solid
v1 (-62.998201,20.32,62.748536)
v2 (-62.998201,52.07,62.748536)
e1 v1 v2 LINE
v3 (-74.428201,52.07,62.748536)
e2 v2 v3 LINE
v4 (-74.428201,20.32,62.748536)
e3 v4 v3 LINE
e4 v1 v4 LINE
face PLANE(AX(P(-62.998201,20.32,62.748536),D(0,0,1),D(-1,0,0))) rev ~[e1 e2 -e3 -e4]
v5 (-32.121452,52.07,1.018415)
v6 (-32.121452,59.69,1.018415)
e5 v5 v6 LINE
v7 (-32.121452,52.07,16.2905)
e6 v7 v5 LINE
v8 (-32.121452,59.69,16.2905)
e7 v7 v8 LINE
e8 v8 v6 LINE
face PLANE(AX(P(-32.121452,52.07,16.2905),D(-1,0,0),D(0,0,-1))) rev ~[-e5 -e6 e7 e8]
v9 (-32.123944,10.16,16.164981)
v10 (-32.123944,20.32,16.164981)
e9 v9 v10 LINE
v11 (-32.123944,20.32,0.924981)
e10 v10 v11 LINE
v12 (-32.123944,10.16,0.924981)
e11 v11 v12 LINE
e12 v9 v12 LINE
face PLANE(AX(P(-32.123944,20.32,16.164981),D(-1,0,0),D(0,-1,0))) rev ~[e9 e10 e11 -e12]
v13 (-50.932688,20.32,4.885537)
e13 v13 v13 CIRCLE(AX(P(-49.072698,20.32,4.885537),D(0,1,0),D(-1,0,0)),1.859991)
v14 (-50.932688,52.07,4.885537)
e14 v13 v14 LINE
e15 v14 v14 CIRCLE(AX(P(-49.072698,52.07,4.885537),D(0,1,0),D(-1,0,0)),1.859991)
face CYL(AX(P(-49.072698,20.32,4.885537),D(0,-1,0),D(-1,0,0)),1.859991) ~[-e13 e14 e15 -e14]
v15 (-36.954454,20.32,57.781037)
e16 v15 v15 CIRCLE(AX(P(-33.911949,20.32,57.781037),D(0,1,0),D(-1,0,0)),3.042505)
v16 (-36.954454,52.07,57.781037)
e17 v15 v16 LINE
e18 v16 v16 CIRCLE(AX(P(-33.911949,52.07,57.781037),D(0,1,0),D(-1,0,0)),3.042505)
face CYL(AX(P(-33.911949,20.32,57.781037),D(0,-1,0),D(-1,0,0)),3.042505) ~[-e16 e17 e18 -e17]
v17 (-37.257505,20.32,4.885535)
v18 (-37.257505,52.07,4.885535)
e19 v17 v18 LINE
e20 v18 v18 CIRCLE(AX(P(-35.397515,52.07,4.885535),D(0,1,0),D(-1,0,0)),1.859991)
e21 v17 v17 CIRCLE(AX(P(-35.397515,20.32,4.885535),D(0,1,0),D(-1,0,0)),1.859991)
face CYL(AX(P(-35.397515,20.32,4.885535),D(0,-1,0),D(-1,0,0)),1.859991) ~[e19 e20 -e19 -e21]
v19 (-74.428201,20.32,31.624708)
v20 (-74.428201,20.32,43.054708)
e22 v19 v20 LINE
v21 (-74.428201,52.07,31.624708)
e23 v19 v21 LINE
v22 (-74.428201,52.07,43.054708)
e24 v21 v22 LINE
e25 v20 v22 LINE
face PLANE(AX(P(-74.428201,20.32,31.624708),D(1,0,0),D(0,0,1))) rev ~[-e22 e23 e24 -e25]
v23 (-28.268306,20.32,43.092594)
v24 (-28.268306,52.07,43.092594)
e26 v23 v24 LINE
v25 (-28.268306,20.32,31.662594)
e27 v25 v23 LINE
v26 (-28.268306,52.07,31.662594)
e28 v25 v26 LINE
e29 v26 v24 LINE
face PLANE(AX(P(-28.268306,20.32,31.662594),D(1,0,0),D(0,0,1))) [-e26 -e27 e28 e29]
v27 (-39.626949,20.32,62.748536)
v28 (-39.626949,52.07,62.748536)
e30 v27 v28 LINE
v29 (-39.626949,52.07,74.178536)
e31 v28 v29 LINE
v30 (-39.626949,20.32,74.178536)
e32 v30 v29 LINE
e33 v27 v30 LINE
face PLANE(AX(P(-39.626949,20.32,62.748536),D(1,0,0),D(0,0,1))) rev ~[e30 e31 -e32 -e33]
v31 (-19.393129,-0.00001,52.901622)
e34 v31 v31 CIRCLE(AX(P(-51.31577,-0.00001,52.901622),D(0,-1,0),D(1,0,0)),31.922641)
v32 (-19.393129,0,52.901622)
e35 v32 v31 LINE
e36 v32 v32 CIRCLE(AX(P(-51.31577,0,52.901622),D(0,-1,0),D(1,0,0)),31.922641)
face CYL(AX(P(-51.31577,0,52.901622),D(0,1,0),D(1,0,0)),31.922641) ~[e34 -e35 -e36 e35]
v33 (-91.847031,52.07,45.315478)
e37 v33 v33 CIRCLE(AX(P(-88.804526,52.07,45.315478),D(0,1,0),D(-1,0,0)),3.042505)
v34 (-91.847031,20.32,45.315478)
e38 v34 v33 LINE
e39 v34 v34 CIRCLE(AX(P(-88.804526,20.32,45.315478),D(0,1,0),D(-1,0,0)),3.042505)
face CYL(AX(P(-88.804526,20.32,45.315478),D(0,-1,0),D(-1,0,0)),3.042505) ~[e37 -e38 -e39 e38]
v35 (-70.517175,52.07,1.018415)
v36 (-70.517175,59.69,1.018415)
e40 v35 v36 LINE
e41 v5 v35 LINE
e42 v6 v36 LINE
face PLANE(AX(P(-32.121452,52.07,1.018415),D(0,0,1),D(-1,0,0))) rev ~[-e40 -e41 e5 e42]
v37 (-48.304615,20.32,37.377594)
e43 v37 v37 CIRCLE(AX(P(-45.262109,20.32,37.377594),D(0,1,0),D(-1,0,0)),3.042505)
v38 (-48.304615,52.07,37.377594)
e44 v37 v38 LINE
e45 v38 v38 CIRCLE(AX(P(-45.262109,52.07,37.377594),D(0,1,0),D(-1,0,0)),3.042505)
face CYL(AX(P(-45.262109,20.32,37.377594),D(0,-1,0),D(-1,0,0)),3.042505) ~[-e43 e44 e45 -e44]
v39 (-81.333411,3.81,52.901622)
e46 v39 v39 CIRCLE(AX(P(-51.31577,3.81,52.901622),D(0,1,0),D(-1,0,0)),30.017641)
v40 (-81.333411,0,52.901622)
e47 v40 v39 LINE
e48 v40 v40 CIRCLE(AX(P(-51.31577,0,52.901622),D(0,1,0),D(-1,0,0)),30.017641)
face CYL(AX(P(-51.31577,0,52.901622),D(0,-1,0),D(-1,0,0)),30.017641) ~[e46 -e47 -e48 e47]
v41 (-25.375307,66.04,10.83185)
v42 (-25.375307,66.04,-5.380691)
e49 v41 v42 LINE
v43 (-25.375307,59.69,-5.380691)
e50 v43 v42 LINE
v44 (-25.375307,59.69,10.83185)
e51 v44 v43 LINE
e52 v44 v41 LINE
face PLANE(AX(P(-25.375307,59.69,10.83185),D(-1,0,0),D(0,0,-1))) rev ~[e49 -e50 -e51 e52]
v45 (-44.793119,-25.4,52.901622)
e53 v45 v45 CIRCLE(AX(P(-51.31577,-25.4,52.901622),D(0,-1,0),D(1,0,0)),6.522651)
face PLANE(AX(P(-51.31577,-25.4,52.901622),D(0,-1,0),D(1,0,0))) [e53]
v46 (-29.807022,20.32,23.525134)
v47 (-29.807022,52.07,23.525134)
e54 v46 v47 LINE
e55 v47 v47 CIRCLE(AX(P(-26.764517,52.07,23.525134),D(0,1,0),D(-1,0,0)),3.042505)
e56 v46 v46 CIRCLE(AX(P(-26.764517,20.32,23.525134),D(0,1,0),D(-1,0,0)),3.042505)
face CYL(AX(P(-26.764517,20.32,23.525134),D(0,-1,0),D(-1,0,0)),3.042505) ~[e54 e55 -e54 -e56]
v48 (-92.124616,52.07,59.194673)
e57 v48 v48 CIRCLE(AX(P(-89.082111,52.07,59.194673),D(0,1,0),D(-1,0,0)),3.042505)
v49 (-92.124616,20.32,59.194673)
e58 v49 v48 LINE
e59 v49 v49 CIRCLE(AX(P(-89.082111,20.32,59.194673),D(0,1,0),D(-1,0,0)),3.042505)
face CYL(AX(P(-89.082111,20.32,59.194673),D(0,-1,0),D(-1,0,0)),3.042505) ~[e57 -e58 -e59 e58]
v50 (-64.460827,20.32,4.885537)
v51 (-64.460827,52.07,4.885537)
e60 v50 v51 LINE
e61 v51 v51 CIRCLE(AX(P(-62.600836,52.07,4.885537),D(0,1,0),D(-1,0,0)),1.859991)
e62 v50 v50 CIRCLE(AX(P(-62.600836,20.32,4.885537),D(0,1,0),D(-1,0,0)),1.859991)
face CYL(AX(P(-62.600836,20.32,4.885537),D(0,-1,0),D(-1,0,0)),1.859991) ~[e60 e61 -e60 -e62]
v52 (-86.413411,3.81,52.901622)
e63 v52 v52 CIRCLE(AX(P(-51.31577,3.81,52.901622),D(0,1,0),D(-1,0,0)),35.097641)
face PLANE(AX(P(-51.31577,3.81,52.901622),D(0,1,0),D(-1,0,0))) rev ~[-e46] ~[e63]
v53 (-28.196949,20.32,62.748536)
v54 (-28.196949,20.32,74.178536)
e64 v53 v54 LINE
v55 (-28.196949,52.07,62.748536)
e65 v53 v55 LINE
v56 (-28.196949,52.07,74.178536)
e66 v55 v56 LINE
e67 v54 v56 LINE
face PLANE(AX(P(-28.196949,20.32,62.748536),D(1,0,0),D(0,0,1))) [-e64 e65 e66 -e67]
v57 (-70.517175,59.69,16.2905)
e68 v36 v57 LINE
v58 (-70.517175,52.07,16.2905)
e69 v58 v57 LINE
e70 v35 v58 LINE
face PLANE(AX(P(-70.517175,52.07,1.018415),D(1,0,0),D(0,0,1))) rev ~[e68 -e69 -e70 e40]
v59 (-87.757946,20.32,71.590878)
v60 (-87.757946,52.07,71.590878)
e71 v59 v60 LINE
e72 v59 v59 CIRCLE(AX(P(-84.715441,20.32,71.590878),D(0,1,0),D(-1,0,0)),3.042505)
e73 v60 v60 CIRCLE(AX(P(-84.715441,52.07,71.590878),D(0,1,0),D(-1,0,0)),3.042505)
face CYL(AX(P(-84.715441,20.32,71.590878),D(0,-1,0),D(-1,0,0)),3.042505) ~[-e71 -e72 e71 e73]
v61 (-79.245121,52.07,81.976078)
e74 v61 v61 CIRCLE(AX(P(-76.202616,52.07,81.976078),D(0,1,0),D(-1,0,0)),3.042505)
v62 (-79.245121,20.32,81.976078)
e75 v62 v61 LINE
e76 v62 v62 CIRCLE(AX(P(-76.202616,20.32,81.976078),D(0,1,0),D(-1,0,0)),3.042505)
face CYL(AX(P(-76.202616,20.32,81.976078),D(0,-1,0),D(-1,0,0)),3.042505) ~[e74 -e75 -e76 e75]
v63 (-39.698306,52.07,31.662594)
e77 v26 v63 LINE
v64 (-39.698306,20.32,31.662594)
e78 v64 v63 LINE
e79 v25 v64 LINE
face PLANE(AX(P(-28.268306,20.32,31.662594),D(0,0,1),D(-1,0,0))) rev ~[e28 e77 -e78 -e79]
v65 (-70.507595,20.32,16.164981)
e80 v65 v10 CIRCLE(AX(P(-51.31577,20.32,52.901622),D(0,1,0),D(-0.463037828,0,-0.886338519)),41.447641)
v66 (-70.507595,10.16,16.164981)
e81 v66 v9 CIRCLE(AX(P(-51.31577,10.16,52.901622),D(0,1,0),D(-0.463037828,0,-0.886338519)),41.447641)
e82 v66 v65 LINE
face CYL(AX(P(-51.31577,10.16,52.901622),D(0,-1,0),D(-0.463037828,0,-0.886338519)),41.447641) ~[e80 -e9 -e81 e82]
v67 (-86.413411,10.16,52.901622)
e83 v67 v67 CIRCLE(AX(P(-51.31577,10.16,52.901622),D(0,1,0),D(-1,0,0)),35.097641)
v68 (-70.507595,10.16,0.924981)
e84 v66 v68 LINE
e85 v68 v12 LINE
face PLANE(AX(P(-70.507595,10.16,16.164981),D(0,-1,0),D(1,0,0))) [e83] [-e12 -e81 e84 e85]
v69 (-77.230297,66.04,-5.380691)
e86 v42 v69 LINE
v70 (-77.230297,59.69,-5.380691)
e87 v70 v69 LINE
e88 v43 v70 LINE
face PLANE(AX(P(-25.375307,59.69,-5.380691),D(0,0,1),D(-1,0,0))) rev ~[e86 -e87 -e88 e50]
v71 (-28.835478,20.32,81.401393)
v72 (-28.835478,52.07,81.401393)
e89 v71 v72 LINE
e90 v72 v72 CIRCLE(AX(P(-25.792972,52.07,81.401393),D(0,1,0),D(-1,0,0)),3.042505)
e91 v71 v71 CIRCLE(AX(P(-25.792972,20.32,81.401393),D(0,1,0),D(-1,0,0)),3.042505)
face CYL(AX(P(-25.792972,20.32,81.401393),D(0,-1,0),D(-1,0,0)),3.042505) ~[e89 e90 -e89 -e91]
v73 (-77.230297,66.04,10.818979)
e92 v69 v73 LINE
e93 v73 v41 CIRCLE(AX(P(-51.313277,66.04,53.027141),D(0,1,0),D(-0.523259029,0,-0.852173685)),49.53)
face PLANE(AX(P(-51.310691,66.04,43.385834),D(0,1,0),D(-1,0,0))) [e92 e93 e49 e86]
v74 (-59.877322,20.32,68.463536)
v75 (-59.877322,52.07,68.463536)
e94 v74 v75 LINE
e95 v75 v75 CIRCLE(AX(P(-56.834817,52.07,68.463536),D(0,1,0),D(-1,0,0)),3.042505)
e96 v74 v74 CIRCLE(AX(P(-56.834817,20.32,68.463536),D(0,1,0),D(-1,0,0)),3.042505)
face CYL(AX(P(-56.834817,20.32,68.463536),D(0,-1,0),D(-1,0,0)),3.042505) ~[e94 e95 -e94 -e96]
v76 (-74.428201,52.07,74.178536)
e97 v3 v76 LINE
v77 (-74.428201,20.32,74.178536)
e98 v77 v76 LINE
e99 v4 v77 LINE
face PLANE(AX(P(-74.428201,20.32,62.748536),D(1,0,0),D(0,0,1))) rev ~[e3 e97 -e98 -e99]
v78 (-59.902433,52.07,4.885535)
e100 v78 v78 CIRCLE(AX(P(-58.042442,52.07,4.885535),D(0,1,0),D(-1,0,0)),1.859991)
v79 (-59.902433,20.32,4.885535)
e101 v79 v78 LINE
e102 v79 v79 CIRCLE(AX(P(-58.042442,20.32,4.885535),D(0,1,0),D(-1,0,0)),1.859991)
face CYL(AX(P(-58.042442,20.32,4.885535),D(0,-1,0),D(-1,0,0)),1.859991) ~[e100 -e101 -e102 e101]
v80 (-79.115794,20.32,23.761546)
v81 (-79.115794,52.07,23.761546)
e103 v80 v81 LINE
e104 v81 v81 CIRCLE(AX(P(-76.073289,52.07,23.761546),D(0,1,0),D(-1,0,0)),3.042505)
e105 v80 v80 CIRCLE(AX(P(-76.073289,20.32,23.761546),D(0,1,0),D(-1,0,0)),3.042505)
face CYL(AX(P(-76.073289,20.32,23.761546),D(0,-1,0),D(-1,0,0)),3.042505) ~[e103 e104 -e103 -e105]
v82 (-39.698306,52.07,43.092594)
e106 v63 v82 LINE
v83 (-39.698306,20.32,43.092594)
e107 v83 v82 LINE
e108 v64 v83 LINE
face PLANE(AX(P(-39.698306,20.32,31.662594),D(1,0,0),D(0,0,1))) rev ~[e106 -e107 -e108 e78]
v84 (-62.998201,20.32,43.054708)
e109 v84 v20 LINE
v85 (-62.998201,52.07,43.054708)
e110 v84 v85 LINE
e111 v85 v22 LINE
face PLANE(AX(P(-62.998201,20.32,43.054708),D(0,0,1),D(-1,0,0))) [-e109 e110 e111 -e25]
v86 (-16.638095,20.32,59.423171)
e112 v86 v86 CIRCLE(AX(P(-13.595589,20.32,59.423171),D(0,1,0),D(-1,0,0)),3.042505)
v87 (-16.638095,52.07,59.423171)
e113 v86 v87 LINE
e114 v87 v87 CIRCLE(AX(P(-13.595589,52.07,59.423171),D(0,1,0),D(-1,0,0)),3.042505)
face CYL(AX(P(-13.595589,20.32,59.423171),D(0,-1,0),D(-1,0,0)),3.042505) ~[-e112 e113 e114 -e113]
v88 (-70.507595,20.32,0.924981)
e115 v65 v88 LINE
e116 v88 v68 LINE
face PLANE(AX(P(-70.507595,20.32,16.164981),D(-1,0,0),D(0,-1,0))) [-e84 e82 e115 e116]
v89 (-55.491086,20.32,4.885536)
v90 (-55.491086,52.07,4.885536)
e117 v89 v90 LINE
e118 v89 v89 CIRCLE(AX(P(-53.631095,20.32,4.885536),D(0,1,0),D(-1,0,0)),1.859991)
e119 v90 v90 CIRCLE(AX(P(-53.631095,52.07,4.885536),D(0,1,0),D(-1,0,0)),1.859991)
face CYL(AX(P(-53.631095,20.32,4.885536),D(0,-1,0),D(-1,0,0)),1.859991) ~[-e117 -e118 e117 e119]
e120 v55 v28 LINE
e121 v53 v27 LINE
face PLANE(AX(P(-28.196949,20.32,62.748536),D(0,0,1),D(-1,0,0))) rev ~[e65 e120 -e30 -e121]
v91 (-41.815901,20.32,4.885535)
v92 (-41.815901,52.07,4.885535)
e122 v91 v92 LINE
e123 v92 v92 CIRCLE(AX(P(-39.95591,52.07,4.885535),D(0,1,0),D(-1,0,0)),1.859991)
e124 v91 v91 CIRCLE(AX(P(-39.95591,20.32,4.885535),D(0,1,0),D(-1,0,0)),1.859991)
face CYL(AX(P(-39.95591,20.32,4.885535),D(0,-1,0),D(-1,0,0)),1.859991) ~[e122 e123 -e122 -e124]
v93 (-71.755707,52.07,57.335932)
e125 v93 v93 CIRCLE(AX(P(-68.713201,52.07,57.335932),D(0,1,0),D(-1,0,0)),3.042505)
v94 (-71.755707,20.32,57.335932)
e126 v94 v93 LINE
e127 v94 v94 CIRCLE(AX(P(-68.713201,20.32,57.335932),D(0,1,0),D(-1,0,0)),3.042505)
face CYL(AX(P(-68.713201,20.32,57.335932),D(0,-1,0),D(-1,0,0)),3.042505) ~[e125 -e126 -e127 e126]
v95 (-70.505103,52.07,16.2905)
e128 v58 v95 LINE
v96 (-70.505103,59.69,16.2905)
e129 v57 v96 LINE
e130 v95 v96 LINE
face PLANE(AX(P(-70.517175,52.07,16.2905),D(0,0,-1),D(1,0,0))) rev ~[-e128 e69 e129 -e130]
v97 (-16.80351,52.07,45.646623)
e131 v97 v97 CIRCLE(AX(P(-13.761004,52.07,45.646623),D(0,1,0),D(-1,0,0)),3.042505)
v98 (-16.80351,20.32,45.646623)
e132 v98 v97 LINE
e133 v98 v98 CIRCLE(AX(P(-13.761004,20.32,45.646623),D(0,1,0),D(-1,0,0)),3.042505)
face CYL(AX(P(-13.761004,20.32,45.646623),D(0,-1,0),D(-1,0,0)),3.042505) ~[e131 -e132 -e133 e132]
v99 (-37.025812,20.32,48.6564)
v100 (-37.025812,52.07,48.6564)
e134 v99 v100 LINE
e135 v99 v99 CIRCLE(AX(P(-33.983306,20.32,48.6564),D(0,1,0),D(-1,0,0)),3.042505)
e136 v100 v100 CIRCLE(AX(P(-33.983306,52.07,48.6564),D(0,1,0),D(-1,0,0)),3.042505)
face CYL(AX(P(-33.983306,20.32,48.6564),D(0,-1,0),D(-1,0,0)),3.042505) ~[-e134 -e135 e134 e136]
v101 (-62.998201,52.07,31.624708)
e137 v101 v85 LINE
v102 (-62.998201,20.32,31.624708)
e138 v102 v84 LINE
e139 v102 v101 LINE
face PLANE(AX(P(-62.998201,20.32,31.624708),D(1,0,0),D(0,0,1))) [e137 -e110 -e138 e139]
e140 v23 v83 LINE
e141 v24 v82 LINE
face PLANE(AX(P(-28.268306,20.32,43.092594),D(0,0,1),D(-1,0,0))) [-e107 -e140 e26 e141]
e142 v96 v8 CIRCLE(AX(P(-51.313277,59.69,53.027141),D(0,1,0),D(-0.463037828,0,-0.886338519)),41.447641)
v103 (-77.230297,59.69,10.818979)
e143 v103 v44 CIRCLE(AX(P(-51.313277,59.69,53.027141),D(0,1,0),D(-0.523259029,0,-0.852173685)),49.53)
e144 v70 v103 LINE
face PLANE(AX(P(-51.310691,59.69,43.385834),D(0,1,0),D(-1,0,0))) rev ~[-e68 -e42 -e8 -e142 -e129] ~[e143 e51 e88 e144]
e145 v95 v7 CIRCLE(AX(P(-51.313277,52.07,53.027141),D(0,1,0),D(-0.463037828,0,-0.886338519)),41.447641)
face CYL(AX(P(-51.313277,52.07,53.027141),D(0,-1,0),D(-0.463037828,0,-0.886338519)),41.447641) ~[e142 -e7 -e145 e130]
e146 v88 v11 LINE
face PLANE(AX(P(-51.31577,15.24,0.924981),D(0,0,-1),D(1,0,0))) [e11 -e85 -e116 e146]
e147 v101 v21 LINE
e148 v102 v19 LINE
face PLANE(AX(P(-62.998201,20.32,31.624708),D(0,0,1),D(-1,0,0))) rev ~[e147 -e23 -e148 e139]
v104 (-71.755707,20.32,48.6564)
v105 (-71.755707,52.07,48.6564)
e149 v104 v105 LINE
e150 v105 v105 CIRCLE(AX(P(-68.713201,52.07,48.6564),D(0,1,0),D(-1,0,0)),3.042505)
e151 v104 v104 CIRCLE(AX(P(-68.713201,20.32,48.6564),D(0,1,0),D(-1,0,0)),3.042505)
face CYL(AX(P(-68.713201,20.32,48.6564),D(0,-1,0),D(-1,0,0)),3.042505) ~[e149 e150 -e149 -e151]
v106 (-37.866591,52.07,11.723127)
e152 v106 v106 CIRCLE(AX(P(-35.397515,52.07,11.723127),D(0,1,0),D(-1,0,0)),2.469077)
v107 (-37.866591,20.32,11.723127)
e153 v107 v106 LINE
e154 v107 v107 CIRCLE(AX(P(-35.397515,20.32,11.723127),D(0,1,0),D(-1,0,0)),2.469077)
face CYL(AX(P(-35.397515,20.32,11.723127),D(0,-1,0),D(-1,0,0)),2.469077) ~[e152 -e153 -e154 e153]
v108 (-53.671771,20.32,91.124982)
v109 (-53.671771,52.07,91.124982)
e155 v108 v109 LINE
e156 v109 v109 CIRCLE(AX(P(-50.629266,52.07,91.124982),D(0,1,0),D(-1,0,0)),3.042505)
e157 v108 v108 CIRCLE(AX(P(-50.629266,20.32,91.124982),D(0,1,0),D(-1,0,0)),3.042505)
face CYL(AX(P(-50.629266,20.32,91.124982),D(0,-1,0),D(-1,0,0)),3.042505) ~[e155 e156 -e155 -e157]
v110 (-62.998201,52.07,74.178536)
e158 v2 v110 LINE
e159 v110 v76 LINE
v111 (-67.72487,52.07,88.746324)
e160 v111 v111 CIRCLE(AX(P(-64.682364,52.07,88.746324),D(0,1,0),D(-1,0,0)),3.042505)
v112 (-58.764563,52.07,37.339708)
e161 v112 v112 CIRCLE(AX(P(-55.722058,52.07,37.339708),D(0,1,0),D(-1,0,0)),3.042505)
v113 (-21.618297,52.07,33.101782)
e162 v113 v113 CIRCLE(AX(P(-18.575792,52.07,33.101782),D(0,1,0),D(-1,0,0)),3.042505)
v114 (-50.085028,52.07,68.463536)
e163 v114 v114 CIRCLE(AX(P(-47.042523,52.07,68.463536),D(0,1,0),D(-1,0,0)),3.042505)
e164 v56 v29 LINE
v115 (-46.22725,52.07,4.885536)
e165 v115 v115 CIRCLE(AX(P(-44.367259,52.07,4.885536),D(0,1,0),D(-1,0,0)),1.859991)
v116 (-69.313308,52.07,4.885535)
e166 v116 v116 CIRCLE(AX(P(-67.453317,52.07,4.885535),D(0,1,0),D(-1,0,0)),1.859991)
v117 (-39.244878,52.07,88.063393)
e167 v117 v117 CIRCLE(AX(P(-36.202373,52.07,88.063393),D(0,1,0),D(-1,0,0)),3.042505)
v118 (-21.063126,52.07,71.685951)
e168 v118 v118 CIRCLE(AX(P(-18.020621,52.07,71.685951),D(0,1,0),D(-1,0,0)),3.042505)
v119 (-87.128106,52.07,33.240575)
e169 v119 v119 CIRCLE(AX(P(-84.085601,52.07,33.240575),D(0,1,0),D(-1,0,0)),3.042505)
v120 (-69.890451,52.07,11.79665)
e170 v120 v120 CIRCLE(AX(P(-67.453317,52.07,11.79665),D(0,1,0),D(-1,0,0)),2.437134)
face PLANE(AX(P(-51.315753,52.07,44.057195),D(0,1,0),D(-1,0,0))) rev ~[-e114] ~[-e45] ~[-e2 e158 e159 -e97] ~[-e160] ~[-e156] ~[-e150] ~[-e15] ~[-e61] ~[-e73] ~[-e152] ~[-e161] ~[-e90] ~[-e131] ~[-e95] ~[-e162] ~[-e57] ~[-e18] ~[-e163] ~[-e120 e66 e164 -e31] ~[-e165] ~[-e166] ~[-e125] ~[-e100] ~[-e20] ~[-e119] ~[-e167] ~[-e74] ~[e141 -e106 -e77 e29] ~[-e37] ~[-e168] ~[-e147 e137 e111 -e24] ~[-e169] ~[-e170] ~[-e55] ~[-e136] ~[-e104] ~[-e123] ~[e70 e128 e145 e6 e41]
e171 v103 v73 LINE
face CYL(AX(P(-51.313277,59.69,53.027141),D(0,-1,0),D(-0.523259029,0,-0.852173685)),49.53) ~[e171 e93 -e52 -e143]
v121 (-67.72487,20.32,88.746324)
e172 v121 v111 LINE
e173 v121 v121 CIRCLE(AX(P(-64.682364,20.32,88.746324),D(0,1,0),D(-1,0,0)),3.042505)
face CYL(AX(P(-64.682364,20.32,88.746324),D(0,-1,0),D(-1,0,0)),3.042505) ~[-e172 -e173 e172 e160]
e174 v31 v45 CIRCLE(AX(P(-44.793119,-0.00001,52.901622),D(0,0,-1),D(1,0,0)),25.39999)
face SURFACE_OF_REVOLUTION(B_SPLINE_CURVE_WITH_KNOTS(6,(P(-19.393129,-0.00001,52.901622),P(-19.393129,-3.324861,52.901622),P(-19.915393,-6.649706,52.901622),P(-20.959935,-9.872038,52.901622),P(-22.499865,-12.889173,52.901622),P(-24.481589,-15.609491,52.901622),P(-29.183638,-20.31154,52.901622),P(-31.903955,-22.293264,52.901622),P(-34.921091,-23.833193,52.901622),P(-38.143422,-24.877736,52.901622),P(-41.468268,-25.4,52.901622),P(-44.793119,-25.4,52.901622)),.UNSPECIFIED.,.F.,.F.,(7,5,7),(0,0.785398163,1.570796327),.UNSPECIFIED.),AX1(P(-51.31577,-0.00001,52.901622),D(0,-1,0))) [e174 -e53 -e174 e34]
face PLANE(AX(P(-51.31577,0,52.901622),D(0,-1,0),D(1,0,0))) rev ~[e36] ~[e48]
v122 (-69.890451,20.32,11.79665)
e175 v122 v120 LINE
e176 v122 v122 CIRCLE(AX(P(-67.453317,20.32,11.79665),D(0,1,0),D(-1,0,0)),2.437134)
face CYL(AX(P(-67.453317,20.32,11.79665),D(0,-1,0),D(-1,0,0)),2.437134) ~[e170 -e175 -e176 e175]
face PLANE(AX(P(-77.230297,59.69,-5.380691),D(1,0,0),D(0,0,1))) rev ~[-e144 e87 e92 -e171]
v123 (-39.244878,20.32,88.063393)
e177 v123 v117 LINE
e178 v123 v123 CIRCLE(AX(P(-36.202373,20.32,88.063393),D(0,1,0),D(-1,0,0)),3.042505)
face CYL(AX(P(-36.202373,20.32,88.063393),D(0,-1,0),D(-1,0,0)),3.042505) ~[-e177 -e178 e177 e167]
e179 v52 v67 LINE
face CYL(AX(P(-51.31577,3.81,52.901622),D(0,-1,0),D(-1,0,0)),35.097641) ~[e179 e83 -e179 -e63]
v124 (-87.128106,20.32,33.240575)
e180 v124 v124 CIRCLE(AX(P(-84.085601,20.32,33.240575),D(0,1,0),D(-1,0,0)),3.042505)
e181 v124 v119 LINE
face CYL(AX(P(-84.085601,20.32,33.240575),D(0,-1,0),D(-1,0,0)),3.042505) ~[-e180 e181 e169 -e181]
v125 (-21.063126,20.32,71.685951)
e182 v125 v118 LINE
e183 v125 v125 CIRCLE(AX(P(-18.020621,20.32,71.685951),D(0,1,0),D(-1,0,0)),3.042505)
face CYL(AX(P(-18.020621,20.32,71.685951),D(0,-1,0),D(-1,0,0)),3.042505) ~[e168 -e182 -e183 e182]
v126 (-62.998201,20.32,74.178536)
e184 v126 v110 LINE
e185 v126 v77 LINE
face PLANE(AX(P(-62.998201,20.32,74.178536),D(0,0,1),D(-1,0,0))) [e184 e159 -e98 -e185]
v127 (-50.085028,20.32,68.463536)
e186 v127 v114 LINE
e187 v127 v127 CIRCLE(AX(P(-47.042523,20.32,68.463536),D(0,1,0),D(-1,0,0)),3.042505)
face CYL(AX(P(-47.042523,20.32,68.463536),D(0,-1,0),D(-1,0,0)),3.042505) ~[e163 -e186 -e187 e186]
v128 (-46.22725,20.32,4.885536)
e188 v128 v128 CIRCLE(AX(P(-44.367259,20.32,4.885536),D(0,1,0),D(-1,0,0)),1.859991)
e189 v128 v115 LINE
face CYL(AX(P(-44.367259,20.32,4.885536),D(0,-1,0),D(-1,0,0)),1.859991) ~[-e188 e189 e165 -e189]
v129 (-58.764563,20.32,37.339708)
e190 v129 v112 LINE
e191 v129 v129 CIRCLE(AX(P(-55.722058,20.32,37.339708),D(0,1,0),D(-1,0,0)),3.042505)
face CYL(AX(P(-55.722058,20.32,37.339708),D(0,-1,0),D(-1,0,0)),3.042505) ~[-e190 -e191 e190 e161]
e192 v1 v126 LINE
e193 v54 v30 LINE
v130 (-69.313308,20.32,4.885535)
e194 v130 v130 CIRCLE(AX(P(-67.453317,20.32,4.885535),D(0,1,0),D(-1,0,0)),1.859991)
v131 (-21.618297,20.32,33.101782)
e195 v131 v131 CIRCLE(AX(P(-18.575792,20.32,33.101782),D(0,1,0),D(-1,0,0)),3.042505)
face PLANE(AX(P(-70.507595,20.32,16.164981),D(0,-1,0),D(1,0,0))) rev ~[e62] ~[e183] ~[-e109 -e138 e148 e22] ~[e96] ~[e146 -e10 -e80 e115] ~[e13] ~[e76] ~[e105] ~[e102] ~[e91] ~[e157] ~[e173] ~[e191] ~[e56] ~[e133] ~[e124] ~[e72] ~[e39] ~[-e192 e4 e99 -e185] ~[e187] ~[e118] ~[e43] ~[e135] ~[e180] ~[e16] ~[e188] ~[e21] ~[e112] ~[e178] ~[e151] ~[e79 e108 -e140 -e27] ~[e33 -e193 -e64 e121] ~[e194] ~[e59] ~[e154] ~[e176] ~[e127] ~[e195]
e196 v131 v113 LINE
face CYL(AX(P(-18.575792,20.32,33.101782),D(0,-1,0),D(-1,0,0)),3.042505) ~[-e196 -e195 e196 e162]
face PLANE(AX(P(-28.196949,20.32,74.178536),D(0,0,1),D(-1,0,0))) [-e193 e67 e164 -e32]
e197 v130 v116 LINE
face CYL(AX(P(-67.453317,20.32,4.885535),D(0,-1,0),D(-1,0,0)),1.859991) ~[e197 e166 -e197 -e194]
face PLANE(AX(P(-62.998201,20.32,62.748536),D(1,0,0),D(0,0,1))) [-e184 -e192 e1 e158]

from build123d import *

# Parameters (mm, degrees)
F1_DEPTH  = 25.4
F2_R      = 25.39999
F3_R      = 30.0176409496
F4_DEPTH  = 3.81
F5_R      = 35.0976409496
F6_DEPTH  = 6.35
F7_R      = 35.0976409496
F8_DEPTH  = 10.16
F9_DEPTH  = 10.16
F10_W     = 38.3836512671
F10_H     = 10.16
F11_DEPTH = 15.24
F12_R     = 3.0425051658
F13_DEPTH = 31.75
F12_R_2   = 1.8599906357
F12_R_3   = 2.469076523
F12_R_4   = 2.4371339636
F12_W     = 11.43
F12_H     = 11.43
F15_DEPTH = 7.62
F18_DEPTH = 6.35


# Not quite as in the source:
# - a fillet or chamfer is up to 0.001 mm smaller than in the source, because OpenCascade refuses the exact size


with BuildPart() as f1:
    # F0 (on Front) → F1 (new body)
    with BuildSketch(Plane.XZ):
        with BuildLine():
            ThreePointArc((-51.3157695532, 20.9789809584), (-28.7430536644, 30.3289060191), (-19.3931286036, 52.9016219079))
            ThreePointArc((-19.3931286036, 52.9016219079), (-73.888485442, 75.4743377968), (-51.3157695532, 20.9789809584))
        make_face()
    extrude(amount=F1_DEPTH)

    # F2 (radius 25.4 in the source; OpenCascade refuses exactly that, so slightly less here)
    f2_edges = [f1.edges().sort_by_distance(p)[0] for p in [
        (-51.31577, -25.4, 84.824263),
    ]]
    fillet(f2_edges, radius=F2_R)

    # F3 (on face) → F4 (join)
    with BuildSketch(Plane(origin=(0, 0, 0), x_dir=(-1, 0, 0), z_dir=(0, 1, 0))):
        with Locations((51.3157695532, 52.9016219079)):
            Circle(F3_R)
    extrude(amount=F4_DEPTH)

    # F5 (on face) → F6 (join)
    with BuildSketch(Plane(origin=(0, 3.81, 0), x_dir=(-1, 0, 0), z_dir=(0, 1, 0))):
        with Locations((51.3157695532, 52.9016219079)):
            Circle(F5_R)
    extrude(amount=F6_DEPTH)



with BuildPart() as f8:
    # F7 (on face) → F8 (new body)
    with BuildSketch(Plane(origin=(0, 10.16, 0), x_dir=(-1, 0, 0), z_dir=(0, 1, 0))):
        with BuildLine():
            Line((32.1239439196, 16.1649812187), (70.5075951867, 16.1649812187))
            ThreePointArc((70.5075951867, 16.1649812187), (51.3157695532, 94.3492628575), (32.1239439196, 16.1649812187))
        make_face()
        with Locations((51.3157695532, 52.9016219079)):
            Circle(F7_R, mode=Mode.SUBTRACT)
    extrude(amount=F8_DEPTH)


with BuildPart() as f1_1:
    add(f1.part)

    add(f8.part)  # F9 merges F8
    # F7 (on face) → F9 (join)
    with BuildSketch(Plane(origin=(0, 10.16, 0), x_dir=(-1, 0, 0), z_dir=(0, 1, 0))):
        with Locations((51.3157695532, 52.9016219079)):
            Circle(F7_R)
    extrude(amount=F9_DEPTH)

    # F10 (on face) → F11 (join)
    with BuildSketch(Plane(origin=(0, 0, 16.1649812187), x_dir=(1, 0, 0), z_dir=(0, 0, -1))):
        with Locations((-51.3157695532, -15.24)):
            Rectangle(F10_W, F10_H)
    extrude(amount=F11_DEPTH)

    # F12 (on face) → F13, piece 2 (join)
    with BuildSketch(Plane(origin=(0, 20.32, 0), x_dir=(-1, 0, 0), z_dir=(0, 1, 0))):
        with Locations((67.4533173442, 4.8855347559)):
            Circle(F12_R_2)
        with Locations((35.3975147009, 4.8855352215)):
            Circle(F12_R_2)
        with Locations((39.9559102952, 4.8855347559)):
            Circle(F12_R_2)
        with Locations((44.3672593683, 4.8855361529)):
            Circle(F12_R_2)
        with Locations((49.0726977587, 4.8855366185)):
            Circle(F12_R_2)
        with Locations((53.6310952157, 4.8855361529)):
            Circle(F12_R_2)
        with Locations((58.0424424261, 4.8855347559)):
            Circle(F12_R_2)
        with Locations((62.6008361578, 4.8855366185)):
            Circle(F12_R_2)
        with Locations((35.3975147009, 11.7231269833)):
            Circle(F12_R_3)
        with Locations((67.4533173442, 11.7966495454)):
            Circle(F12_R_4)
        with Locations((13.5955894366, 59.4231709838)):
            Circle(F12_R)
        with Locations((50.6292656064, 91.1249816418)):
            Circle(F12_R)
        with Locations((18.5757915024, 33.1017822027)):
            Circle(F12_R)
        with Locations((25.7929724175, 81.4013928175)):
            Circle(F12_R)
        with Locations((89.0821111389, 59.1946728528)):
            Circle(F12_R)
        with Locations((84.0856006835, 33.2405753434)):
            Circle(F12_R)
        with Locations((76.2026160955, 81.9760784507)):
            Circle(F12_R)
        with Locations((36.2023725174, 88.0633927882)):
            Circle(F12_R)
        with Locations((88.8045257889, 45.3154779971)):
            Circle(F12_R)
        with Locations((18.0206210352, 71.6859512031)):
            Circle(F12_R)
        with Locations((13.761004433, 45.646622777)):
            Circle(F12_R)
        with Locations((64.6823644638, 88.7463241816)):
            Circle(F12_R)
        with Locations((84.7154408693, 71.5908780694)):
            Circle(F12_R)
        with Locations((26.7645169515, 23.525133729)):
            Circle(F12_R)
        with Locations((76.0732889175, 23.7615462393)):
            Circle(F12_R)
        with Locations((68.7132014135, 68.4635355137)):
            Rectangle(F12_W, F12_H)
        with Locations((33.9833064711, 37.3775935507)):
            Rectangle(F12_W, F12_H)
        with Locations((33.9119490236, 68.4635355137)):
            Rectangle(F12_W, F12_H)
        with Locations((68.7132014135, 37.3397083022)):
            Rectangle(F12_W, F12_H)
        with Locations((33.9833064711, 48.6564002931)):
            Circle(F12_R)
        with Locations((33.9119490236, 57.7810369432)):
            Circle(F12_R)
        with Locations((56.8348169327, 68.4635355137)):
            Circle(F12_R)
        with Locations((68.7132014135, 57.3359318078)):
            Circle(F12_R)
        with Locations((68.7132014135, 48.6564002931)):
            Circle(F12_R)
        with Locations((55.7220578194, 37.3397083022)):
            Circle(F12_R)
        with Locations((47.0425225794, 68.4635355137)):
            Circle(F12_R)
        with Locations((45.2621094882, 37.3775935507)):
            Circle(F12_R)
    extrude(amount=F13_DEPTH)

    # F14 (on face) → F15 (join)
    with BuildSketch(Plane(origin=(0, 52.07, 0), x_dir=(-1, 0, 0), z_dir=(0, 1, 0))):
        with BuildLine():
            Line((70.5171748996, 16.2905004551), (70.5051029675, 16.2905004551))
            ThreePointArc((70.5051029675, 16.2905004551), (51.313277334, 94.474782094), (32.1214517004, 16.2905004551))
            Line((32.1214517004, 16.2905004551), (32.1214517004, 1.0184145067))
            Line((32.1214517004, 1.0184145067), (70.5171748996, 1.0184145067))
            Line((70.5171748996, 1.0184145067), (70.5171748996, 16.2905004551))
        make_face()
    extrude(amount=F15_DEPTH)

    # F17 (on face) → F18 (join)
    with BuildSketch(Plane(origin=(0, 59.69, 0), x_dir=(-1, 0, 0), z_dir=(0, 1, 0))):
        with BuildLine():
            Line((77.230297029, -5.3806910291), (77.230297029, 10.8189785437))
            ThreePointArc((77.230297029, 10.8189785437), (51.3255716567, 102.5571396186), (25.3753070366, 10.8318499752))
            Line((25.3753070366, 10.8318499752), (25.3753070366, -5.3806910291))
            Line((25.3753070366, -5.3806910291), (77.230297029, -5.3806910291))
        make_face()
    extrude(amount=F18_DEPTH)


with BuildPart() as f13:
    # F12 (on face) → F13 (new body)
    with BuildSketch(Plane(origin=(0, 20.32, 0), x_dir=(-1, 0, 0), z_dir=(0, 1, 0))):
        with Locations((853.825874161, 233.101002872)):
            Circle(F12_R)
    extrude(amount=F13_DEPTH)


solid = f1_1.part
